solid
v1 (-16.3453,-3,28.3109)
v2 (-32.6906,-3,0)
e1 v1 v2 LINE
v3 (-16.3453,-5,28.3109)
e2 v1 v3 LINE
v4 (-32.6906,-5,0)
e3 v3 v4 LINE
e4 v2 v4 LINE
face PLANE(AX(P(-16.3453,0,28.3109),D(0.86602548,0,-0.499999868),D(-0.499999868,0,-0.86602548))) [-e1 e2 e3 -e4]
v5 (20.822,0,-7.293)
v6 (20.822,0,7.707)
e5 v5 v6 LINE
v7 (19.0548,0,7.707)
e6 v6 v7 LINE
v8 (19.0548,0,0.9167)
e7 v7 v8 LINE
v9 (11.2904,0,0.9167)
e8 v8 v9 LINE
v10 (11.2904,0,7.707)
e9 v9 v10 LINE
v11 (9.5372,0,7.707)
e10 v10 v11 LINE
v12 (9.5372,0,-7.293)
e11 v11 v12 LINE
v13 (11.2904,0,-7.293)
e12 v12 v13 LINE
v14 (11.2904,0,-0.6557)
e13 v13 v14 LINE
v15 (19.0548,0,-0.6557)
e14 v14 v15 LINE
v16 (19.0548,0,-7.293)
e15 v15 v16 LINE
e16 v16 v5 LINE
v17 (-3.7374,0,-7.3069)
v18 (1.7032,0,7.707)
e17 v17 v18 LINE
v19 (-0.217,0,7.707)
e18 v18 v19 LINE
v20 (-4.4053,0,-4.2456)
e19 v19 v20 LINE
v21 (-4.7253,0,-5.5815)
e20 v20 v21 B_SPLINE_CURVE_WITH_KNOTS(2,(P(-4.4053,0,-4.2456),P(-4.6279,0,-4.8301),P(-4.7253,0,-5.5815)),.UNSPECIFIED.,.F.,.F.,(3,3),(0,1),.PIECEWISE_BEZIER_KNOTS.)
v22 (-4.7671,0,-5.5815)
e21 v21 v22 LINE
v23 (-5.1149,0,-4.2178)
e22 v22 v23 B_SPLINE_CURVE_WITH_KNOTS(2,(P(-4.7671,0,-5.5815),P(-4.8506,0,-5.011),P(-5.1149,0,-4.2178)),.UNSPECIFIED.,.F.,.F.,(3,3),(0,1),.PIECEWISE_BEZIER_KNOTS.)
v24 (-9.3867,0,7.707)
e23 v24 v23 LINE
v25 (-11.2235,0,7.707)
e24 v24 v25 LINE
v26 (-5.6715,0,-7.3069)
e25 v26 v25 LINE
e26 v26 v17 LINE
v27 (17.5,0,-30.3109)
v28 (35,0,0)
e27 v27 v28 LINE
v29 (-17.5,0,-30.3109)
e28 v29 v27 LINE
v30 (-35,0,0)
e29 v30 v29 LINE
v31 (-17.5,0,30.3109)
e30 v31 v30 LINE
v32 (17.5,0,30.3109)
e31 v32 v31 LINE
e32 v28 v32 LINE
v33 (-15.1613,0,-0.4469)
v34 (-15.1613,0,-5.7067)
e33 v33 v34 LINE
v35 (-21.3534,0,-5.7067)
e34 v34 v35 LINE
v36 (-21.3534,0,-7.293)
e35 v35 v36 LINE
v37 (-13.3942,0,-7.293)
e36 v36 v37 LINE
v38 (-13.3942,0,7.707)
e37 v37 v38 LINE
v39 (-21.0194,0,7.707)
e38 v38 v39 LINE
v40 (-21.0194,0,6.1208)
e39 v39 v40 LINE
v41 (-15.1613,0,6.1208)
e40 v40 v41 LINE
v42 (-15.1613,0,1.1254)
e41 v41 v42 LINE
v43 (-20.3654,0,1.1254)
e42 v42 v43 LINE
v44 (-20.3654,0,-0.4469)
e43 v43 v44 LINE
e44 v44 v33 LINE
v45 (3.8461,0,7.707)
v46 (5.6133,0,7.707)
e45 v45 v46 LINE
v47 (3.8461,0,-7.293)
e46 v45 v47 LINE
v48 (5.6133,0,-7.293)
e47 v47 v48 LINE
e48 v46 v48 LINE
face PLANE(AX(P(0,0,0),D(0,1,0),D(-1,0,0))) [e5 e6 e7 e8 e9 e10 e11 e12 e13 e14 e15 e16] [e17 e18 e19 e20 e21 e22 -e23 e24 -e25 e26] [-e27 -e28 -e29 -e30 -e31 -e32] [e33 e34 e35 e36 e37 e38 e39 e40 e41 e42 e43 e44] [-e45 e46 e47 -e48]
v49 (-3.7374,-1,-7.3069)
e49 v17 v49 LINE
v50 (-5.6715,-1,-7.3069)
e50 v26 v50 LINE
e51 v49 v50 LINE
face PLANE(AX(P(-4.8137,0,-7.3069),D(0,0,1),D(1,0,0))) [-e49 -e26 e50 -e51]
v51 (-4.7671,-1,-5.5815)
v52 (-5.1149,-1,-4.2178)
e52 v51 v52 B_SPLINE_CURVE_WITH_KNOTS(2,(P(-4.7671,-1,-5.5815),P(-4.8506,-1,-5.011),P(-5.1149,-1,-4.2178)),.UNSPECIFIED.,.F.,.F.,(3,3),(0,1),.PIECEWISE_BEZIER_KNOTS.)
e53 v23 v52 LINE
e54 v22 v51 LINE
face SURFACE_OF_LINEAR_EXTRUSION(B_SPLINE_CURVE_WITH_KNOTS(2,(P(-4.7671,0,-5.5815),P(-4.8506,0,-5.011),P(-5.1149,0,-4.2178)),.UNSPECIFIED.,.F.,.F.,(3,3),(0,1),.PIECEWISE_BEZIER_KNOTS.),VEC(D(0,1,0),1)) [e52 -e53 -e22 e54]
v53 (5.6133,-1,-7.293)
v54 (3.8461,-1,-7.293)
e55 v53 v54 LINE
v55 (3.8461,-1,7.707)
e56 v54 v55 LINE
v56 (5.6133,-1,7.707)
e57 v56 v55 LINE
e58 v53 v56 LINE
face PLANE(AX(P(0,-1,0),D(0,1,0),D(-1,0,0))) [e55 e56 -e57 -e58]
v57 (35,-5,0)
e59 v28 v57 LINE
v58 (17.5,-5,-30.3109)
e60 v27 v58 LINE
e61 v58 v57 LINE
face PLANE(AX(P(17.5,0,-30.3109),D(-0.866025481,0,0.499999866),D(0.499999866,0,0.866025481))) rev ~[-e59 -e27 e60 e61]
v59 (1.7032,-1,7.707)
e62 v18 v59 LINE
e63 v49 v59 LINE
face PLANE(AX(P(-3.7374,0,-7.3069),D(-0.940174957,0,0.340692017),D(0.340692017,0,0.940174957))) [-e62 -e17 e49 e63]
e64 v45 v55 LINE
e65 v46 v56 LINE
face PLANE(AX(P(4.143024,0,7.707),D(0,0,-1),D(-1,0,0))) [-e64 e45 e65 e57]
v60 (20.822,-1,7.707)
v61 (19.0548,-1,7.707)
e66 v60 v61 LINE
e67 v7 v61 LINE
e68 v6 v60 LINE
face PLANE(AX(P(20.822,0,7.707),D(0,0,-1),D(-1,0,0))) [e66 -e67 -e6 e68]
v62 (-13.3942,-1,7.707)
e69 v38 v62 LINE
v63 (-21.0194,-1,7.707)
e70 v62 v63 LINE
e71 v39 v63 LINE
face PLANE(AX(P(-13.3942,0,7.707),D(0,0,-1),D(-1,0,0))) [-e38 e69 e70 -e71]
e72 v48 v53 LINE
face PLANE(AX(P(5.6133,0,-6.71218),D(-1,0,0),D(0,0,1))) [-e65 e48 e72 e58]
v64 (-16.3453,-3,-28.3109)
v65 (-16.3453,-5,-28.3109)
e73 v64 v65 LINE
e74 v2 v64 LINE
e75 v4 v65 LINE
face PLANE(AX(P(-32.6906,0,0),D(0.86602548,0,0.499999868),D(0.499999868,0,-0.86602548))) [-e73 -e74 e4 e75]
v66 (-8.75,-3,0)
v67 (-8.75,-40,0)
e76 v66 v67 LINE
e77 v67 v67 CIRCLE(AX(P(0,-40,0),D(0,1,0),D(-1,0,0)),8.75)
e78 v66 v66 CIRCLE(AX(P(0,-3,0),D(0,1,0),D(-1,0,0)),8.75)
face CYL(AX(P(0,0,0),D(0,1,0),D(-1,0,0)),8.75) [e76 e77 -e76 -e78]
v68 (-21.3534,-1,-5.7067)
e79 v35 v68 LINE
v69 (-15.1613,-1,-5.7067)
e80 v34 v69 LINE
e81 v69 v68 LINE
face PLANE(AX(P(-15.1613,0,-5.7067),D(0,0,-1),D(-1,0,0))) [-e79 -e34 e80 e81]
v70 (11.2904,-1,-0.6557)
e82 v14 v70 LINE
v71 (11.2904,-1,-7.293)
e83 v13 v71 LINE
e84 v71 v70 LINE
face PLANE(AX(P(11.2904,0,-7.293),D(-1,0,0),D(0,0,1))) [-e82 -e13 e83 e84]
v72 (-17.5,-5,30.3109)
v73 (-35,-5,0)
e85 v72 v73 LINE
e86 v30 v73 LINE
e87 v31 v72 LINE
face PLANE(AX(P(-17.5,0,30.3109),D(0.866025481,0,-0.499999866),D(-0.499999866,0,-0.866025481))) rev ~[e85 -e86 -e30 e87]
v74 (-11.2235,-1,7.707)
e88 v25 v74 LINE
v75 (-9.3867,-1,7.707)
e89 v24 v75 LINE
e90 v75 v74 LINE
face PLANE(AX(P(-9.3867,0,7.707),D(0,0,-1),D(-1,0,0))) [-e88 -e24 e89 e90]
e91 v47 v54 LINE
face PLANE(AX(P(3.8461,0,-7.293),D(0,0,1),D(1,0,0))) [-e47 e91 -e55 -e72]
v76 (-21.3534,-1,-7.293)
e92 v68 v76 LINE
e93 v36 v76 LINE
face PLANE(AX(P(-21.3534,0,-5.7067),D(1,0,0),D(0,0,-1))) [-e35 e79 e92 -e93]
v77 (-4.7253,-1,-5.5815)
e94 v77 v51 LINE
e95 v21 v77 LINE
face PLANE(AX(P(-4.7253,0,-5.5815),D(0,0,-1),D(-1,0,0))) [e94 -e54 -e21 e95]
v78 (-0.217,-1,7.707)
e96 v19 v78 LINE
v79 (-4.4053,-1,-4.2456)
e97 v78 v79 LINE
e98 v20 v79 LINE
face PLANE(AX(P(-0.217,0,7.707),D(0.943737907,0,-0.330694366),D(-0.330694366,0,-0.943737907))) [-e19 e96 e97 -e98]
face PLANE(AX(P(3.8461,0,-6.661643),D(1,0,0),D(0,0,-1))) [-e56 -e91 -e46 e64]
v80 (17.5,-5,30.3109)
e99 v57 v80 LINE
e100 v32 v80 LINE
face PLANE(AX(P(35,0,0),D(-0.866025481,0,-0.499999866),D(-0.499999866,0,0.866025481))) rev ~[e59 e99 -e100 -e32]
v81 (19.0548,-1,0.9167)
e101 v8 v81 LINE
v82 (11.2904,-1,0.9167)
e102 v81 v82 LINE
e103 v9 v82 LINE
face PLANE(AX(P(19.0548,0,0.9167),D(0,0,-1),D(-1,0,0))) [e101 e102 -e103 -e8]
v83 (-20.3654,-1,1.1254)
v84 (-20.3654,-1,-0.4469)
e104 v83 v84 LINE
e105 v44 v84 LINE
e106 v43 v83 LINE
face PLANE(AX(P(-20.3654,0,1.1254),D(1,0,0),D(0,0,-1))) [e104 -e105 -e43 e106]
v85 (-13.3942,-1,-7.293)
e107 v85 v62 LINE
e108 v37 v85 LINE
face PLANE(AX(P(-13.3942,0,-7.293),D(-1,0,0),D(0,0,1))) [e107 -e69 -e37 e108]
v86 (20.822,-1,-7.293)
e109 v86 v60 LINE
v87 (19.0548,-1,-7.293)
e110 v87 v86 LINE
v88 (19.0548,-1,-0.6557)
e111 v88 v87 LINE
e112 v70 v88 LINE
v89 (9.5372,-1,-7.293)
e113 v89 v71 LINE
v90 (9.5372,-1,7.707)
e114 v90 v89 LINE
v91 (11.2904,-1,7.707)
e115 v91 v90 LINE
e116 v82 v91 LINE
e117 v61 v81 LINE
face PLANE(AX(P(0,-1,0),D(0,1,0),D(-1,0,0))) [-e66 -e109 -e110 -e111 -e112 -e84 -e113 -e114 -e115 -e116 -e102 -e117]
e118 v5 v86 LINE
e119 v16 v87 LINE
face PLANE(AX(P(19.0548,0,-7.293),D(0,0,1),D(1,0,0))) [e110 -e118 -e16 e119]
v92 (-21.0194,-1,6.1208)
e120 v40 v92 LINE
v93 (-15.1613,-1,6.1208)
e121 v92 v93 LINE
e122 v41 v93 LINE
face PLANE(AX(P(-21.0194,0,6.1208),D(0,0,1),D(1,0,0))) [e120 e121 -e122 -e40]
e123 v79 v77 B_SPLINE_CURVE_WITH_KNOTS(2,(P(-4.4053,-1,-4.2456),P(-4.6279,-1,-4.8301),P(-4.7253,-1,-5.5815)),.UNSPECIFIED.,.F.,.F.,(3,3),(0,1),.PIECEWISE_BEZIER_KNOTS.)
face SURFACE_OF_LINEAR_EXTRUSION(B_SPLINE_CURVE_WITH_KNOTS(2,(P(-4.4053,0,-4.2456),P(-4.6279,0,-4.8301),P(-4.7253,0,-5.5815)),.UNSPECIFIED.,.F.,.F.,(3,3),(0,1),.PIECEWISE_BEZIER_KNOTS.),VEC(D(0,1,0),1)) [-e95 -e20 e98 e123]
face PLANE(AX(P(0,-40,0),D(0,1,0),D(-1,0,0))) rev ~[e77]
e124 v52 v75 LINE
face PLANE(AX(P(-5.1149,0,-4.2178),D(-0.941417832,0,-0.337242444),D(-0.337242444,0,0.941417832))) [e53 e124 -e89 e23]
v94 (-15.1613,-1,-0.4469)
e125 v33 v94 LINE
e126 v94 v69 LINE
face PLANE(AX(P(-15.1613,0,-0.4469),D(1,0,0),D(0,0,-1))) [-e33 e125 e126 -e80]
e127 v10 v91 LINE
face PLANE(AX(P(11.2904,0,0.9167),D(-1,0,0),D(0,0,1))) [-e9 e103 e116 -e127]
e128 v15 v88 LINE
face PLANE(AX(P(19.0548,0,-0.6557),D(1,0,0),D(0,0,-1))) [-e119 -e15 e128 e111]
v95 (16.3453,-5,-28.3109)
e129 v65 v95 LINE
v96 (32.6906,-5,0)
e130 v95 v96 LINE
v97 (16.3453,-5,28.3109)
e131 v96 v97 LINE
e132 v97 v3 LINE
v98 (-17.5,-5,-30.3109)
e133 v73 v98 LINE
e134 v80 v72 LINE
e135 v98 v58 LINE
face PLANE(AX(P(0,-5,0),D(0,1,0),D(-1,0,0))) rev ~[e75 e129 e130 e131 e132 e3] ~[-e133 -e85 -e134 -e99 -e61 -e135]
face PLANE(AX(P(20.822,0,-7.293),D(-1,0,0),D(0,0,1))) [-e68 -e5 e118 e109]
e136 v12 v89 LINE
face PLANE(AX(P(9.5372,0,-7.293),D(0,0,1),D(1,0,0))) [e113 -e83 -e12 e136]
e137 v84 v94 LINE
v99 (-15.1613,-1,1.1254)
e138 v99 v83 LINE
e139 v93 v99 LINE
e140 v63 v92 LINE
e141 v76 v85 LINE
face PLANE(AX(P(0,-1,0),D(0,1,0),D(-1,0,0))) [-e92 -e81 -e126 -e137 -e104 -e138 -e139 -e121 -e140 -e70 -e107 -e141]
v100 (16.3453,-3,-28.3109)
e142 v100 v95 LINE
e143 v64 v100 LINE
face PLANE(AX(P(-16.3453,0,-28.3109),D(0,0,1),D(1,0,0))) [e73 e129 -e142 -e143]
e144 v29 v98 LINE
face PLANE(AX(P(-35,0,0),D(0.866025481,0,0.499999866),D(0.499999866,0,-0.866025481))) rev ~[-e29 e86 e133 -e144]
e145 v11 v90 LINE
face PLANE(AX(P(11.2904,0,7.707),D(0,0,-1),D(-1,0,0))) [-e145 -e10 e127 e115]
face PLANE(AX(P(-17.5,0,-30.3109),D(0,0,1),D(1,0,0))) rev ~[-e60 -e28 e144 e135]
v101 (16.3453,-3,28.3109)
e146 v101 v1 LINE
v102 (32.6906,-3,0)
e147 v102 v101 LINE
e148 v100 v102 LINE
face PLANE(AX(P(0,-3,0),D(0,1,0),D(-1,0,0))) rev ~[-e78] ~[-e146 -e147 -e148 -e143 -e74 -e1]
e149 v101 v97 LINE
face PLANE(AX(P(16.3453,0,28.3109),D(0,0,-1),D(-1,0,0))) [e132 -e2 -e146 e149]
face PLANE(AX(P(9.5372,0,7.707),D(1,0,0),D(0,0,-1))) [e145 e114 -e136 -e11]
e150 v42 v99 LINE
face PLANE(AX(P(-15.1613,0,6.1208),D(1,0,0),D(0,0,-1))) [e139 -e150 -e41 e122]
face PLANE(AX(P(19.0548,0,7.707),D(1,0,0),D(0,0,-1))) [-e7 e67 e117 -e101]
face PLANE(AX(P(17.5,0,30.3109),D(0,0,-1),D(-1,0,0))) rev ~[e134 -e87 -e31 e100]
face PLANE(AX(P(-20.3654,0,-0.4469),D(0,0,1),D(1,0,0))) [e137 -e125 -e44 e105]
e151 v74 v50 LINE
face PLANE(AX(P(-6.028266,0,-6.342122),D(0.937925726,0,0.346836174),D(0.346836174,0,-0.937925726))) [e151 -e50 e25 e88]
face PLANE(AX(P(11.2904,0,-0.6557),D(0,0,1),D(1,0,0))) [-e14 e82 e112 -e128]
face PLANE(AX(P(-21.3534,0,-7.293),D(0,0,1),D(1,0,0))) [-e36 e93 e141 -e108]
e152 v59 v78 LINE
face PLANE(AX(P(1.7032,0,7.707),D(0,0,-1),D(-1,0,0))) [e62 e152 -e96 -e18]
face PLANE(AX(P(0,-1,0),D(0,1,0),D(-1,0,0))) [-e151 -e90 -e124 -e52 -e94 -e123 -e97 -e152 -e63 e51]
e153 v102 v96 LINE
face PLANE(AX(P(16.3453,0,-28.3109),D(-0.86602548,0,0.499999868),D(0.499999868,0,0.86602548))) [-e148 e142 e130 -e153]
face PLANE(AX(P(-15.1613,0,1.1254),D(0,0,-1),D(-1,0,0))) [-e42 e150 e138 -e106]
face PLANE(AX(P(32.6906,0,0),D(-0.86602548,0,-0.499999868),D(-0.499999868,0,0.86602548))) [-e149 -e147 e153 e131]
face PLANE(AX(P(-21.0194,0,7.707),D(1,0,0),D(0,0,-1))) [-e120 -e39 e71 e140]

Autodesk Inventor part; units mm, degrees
ref_plane "YZ Plane" through (0, 0, 0) normal (1, 0, 0) x (0, 1, 0)
ref_plane "XZ Plane" through (0, 0, 0) normal (0, 1, 0) x (-1, 0, 0)
ref_plane "XY Plane" through (0, 0, 0) normal (0, 0, 1) x (1, 0, 0)
sketch "Sketch1" plane through (0, 0, 0) normal (0, 1, 0) x (-1, 0, 0)
  circle A0 centre (0, 0) radius 35
  line L0 (17.5, -30.3109) -> (-17.5, -30.3109)
  line L1 (-17.5, -30.3109) -> (-35, 0)
  line L2 (-35, 0) -> (-17.5, 30.3109)
  line L3 (-17.5, 30.3109) -> (17.5, 30.3109)
  line L4 (17.5, 30.3109) -> (35, 0)
  line L5 (35, 0) -> (17.5, -30.3109)
  line L6 (16.3453, -28.3109) -> (-16.3453, -28.3109)
  line L7 (-16.3453, -28.3109) -> (-32.6906, 0)
  line L8 (-32.6906, 0) -> (-16.3453, 28.3109)
  line L9 (-16.3453, 28.3109) -> (16.3453, 28.3109)
  line L10 (16.3453, 28.3109) -> (32.6906, 0)
  line L11 (32.6906, 0) -> (16.3453, -28.3109)
  line L12 (0, 0) -> (-17.5, -30.3109)
  circle A1 centre (0, 0) radius 8.75
  line L13 (-22.7839, 7.707) -> (22.7839, 7.707) construction
  line L14 (22.7839, 7.707) -> (22.7839, -7.707) construction
  line L15 (22.7839, -7.707) -> (-22.7839, -7.707) construction
  line L16 (-22.7839, -7.707) -> (-22.7839, 7.707) construction
  line L17 (0, 0) -> (0, -28.3109) construction
  line L18 (1.5082, 8.619) -> (10.7506, 8.619) construction
  line L19 (-22.7839, 0) -> (22.7839, 0) construction
  line L20 (0, 7.707) -> (0, -7.707) construction
  line L21 (-20.822, 7.707) -> (-19.0548, 7.707)
  line L22 (-19.0548, 7.707) -> (-19.0548, 0.9167)
  line L23 (-19.0548, 0.9167) -> (-11.2904, 0.9167)
  line L24 (-11.2904, 0.9167) -> (-11.2904, 7.707)
  line L25 (-11.2904, 7.707) -> (-9.5372, 7.707)
  line L26 (-9.5372, 7.707) -> (-9.5372, -7.293)
  line L27 (-9.5372, -7.293) -> (-11.2904, -7.293)
  line L28 (-11.2904, -7.293) -> (-11.2904, -0.6557)
  line L29 (-11.2904, -0.6557) -> (-19.0548, -0.6557)
  line L30 (-19.0548, -0.6557) -> (-19.0548, -7.293)
  line L31 (-19.0548, -7.293) -> (-20.822, -7.293)
  line L32 (-20.822, -7.293) -> (-20.822, 7.707)
  line L33 (-5.6133, 7.707) -> (-3.8461, 7.707)
  line L34 (-3.8461, 7.707) -> (-3.8461, -7.293)
  line L35 (-3.8461, -7.293) -> (-5.6133, -7.293)
  line L36 (-5.6133, -7.293) -> (-5.6133, 7.707)
  line L37 (-1.7032, 7.707) -> (0.217, 7.707)
  line L38 (0.217, 7.707) -> (4.4053, -4.2456)
  spline S0 degree 2 poles (4.4053, -4.2456) (4.6279, -4.8301) (4.7253, -5.5815) knots 0 0 0 1 1 1
  line L39 (4.7253, -5.5815) -> (4.7671, -5.5815)
  spline S1 degree 2 poles (4.7671, -5.5815) (4.8506, -5.011) (5.1149, -4.2178) knots 0 0 0 1 1 1
  line L40 (5.1149, -4.2178) -> (9.3867, 7.707)
  line L41 (9.3867, 7.707) -> (11.2235, 7.707)
  line L42 (11.2235, 7.707) -> (5.6715, -7.3069)
  line L43 (5.6715, -7.3069) -> (3.7374, -7.3069)
  line L44 (3.7374, -7.3069) -> (-1.7032, 7.707)
  line L45 (13.3942, 7.707) -> (21.0194, 7.707)
  line L46 (21.0194, 7.707) -> (21.0194, 6.1208)
  line L47 (21.0194, 6.1208) -> (15.1613, 6.1208)
  line L48 (15.1613, 6.1208) -> (15.1613, 1.1254)
  line L49 (15.1613, 1.1254) -> (20.3654, 1.1254)
  line L50 (20.3654, 1.1254) -> (20.3654, -0.4469)
  line L51 (20.3654, -0.4469) -> (15.1613, -0.4469)
  line L52 (15.1613, -0.4469) -> (15.1613, -5.7067)
  line L53 (15.1613, -5.7067) -> (21.3534, -5.7067)
  line L54 (21.3534, -5.7067) -> (21.3534, -7.293)
  line L55 (21.3534, -7.293) -> (13.3942, -7.293)
  line L56 (13.3942, -7.293) -> (13.3942, 7.707)
  dimension "d0" = 70
  dimension "d2" = 17.5
  dimension "d1" = 2
extrude "Extrusion1" add sketch "Sketch1" against normal blind 3 contours L6 L7 L8 L9 L10 L11 | L35 L36 A1 | A1 L36 L33 | A1 L42 L43 | L40 L41 L42 A1 | L21 L22 L23 L24 L25 L26 L27 L28 L29 L30 L31 L32 | L45 L46 L47 L48 L49 L50 L51 L52 L53 L54 L55 L56
extrude "Extrusion3" add sketch "Sketch1" against normal blind 5 contours L5 L0 L1 L2 L3 L4
extrude "Extrusion4" add sketch "Sketch1" against normal blind 40 contours L34 L35 L12 | L12 L35 A1 L36 L33 L34 | L34 L33 A1 L40 S1 L39 S0 L38 L37 L44 L43 L12 L35 | L12 A1 L35 | L43 L44 L37 L38 S0 L39 S1 L40 A1 L42 | A1 L36 | L42 A1
extrude "Extrusion6" cut sketch "Sketch1" against normal blind 1 contours L34 L35 L12 | L12 L35 A1 L36 L33 L34 | L35 L36 A1 | A1 L36 L33 | L43 L44 L37 L38 S0 L39 S1 L40 A1 L42 | A1 L42 L43 | L40 L41 L42 A1 | L21 L22 L23 L24 L25 L26 L27 L28 L29 L30 L31 L32 | L45 L46 L47 L48 L49 L50 L51 L52 L53 L54 L55 L56
equation "\"d0\" = diam"
equation "\"d2\" = 0.25 * diam"
equation "\"d3\" = thickness"
equation "\"d9\" = 8 * d5"
equation "\"thickness\" = 3"
equation "\"diam\" = 70"
equation "\"d5\" = 5"
properties part number "stand"
